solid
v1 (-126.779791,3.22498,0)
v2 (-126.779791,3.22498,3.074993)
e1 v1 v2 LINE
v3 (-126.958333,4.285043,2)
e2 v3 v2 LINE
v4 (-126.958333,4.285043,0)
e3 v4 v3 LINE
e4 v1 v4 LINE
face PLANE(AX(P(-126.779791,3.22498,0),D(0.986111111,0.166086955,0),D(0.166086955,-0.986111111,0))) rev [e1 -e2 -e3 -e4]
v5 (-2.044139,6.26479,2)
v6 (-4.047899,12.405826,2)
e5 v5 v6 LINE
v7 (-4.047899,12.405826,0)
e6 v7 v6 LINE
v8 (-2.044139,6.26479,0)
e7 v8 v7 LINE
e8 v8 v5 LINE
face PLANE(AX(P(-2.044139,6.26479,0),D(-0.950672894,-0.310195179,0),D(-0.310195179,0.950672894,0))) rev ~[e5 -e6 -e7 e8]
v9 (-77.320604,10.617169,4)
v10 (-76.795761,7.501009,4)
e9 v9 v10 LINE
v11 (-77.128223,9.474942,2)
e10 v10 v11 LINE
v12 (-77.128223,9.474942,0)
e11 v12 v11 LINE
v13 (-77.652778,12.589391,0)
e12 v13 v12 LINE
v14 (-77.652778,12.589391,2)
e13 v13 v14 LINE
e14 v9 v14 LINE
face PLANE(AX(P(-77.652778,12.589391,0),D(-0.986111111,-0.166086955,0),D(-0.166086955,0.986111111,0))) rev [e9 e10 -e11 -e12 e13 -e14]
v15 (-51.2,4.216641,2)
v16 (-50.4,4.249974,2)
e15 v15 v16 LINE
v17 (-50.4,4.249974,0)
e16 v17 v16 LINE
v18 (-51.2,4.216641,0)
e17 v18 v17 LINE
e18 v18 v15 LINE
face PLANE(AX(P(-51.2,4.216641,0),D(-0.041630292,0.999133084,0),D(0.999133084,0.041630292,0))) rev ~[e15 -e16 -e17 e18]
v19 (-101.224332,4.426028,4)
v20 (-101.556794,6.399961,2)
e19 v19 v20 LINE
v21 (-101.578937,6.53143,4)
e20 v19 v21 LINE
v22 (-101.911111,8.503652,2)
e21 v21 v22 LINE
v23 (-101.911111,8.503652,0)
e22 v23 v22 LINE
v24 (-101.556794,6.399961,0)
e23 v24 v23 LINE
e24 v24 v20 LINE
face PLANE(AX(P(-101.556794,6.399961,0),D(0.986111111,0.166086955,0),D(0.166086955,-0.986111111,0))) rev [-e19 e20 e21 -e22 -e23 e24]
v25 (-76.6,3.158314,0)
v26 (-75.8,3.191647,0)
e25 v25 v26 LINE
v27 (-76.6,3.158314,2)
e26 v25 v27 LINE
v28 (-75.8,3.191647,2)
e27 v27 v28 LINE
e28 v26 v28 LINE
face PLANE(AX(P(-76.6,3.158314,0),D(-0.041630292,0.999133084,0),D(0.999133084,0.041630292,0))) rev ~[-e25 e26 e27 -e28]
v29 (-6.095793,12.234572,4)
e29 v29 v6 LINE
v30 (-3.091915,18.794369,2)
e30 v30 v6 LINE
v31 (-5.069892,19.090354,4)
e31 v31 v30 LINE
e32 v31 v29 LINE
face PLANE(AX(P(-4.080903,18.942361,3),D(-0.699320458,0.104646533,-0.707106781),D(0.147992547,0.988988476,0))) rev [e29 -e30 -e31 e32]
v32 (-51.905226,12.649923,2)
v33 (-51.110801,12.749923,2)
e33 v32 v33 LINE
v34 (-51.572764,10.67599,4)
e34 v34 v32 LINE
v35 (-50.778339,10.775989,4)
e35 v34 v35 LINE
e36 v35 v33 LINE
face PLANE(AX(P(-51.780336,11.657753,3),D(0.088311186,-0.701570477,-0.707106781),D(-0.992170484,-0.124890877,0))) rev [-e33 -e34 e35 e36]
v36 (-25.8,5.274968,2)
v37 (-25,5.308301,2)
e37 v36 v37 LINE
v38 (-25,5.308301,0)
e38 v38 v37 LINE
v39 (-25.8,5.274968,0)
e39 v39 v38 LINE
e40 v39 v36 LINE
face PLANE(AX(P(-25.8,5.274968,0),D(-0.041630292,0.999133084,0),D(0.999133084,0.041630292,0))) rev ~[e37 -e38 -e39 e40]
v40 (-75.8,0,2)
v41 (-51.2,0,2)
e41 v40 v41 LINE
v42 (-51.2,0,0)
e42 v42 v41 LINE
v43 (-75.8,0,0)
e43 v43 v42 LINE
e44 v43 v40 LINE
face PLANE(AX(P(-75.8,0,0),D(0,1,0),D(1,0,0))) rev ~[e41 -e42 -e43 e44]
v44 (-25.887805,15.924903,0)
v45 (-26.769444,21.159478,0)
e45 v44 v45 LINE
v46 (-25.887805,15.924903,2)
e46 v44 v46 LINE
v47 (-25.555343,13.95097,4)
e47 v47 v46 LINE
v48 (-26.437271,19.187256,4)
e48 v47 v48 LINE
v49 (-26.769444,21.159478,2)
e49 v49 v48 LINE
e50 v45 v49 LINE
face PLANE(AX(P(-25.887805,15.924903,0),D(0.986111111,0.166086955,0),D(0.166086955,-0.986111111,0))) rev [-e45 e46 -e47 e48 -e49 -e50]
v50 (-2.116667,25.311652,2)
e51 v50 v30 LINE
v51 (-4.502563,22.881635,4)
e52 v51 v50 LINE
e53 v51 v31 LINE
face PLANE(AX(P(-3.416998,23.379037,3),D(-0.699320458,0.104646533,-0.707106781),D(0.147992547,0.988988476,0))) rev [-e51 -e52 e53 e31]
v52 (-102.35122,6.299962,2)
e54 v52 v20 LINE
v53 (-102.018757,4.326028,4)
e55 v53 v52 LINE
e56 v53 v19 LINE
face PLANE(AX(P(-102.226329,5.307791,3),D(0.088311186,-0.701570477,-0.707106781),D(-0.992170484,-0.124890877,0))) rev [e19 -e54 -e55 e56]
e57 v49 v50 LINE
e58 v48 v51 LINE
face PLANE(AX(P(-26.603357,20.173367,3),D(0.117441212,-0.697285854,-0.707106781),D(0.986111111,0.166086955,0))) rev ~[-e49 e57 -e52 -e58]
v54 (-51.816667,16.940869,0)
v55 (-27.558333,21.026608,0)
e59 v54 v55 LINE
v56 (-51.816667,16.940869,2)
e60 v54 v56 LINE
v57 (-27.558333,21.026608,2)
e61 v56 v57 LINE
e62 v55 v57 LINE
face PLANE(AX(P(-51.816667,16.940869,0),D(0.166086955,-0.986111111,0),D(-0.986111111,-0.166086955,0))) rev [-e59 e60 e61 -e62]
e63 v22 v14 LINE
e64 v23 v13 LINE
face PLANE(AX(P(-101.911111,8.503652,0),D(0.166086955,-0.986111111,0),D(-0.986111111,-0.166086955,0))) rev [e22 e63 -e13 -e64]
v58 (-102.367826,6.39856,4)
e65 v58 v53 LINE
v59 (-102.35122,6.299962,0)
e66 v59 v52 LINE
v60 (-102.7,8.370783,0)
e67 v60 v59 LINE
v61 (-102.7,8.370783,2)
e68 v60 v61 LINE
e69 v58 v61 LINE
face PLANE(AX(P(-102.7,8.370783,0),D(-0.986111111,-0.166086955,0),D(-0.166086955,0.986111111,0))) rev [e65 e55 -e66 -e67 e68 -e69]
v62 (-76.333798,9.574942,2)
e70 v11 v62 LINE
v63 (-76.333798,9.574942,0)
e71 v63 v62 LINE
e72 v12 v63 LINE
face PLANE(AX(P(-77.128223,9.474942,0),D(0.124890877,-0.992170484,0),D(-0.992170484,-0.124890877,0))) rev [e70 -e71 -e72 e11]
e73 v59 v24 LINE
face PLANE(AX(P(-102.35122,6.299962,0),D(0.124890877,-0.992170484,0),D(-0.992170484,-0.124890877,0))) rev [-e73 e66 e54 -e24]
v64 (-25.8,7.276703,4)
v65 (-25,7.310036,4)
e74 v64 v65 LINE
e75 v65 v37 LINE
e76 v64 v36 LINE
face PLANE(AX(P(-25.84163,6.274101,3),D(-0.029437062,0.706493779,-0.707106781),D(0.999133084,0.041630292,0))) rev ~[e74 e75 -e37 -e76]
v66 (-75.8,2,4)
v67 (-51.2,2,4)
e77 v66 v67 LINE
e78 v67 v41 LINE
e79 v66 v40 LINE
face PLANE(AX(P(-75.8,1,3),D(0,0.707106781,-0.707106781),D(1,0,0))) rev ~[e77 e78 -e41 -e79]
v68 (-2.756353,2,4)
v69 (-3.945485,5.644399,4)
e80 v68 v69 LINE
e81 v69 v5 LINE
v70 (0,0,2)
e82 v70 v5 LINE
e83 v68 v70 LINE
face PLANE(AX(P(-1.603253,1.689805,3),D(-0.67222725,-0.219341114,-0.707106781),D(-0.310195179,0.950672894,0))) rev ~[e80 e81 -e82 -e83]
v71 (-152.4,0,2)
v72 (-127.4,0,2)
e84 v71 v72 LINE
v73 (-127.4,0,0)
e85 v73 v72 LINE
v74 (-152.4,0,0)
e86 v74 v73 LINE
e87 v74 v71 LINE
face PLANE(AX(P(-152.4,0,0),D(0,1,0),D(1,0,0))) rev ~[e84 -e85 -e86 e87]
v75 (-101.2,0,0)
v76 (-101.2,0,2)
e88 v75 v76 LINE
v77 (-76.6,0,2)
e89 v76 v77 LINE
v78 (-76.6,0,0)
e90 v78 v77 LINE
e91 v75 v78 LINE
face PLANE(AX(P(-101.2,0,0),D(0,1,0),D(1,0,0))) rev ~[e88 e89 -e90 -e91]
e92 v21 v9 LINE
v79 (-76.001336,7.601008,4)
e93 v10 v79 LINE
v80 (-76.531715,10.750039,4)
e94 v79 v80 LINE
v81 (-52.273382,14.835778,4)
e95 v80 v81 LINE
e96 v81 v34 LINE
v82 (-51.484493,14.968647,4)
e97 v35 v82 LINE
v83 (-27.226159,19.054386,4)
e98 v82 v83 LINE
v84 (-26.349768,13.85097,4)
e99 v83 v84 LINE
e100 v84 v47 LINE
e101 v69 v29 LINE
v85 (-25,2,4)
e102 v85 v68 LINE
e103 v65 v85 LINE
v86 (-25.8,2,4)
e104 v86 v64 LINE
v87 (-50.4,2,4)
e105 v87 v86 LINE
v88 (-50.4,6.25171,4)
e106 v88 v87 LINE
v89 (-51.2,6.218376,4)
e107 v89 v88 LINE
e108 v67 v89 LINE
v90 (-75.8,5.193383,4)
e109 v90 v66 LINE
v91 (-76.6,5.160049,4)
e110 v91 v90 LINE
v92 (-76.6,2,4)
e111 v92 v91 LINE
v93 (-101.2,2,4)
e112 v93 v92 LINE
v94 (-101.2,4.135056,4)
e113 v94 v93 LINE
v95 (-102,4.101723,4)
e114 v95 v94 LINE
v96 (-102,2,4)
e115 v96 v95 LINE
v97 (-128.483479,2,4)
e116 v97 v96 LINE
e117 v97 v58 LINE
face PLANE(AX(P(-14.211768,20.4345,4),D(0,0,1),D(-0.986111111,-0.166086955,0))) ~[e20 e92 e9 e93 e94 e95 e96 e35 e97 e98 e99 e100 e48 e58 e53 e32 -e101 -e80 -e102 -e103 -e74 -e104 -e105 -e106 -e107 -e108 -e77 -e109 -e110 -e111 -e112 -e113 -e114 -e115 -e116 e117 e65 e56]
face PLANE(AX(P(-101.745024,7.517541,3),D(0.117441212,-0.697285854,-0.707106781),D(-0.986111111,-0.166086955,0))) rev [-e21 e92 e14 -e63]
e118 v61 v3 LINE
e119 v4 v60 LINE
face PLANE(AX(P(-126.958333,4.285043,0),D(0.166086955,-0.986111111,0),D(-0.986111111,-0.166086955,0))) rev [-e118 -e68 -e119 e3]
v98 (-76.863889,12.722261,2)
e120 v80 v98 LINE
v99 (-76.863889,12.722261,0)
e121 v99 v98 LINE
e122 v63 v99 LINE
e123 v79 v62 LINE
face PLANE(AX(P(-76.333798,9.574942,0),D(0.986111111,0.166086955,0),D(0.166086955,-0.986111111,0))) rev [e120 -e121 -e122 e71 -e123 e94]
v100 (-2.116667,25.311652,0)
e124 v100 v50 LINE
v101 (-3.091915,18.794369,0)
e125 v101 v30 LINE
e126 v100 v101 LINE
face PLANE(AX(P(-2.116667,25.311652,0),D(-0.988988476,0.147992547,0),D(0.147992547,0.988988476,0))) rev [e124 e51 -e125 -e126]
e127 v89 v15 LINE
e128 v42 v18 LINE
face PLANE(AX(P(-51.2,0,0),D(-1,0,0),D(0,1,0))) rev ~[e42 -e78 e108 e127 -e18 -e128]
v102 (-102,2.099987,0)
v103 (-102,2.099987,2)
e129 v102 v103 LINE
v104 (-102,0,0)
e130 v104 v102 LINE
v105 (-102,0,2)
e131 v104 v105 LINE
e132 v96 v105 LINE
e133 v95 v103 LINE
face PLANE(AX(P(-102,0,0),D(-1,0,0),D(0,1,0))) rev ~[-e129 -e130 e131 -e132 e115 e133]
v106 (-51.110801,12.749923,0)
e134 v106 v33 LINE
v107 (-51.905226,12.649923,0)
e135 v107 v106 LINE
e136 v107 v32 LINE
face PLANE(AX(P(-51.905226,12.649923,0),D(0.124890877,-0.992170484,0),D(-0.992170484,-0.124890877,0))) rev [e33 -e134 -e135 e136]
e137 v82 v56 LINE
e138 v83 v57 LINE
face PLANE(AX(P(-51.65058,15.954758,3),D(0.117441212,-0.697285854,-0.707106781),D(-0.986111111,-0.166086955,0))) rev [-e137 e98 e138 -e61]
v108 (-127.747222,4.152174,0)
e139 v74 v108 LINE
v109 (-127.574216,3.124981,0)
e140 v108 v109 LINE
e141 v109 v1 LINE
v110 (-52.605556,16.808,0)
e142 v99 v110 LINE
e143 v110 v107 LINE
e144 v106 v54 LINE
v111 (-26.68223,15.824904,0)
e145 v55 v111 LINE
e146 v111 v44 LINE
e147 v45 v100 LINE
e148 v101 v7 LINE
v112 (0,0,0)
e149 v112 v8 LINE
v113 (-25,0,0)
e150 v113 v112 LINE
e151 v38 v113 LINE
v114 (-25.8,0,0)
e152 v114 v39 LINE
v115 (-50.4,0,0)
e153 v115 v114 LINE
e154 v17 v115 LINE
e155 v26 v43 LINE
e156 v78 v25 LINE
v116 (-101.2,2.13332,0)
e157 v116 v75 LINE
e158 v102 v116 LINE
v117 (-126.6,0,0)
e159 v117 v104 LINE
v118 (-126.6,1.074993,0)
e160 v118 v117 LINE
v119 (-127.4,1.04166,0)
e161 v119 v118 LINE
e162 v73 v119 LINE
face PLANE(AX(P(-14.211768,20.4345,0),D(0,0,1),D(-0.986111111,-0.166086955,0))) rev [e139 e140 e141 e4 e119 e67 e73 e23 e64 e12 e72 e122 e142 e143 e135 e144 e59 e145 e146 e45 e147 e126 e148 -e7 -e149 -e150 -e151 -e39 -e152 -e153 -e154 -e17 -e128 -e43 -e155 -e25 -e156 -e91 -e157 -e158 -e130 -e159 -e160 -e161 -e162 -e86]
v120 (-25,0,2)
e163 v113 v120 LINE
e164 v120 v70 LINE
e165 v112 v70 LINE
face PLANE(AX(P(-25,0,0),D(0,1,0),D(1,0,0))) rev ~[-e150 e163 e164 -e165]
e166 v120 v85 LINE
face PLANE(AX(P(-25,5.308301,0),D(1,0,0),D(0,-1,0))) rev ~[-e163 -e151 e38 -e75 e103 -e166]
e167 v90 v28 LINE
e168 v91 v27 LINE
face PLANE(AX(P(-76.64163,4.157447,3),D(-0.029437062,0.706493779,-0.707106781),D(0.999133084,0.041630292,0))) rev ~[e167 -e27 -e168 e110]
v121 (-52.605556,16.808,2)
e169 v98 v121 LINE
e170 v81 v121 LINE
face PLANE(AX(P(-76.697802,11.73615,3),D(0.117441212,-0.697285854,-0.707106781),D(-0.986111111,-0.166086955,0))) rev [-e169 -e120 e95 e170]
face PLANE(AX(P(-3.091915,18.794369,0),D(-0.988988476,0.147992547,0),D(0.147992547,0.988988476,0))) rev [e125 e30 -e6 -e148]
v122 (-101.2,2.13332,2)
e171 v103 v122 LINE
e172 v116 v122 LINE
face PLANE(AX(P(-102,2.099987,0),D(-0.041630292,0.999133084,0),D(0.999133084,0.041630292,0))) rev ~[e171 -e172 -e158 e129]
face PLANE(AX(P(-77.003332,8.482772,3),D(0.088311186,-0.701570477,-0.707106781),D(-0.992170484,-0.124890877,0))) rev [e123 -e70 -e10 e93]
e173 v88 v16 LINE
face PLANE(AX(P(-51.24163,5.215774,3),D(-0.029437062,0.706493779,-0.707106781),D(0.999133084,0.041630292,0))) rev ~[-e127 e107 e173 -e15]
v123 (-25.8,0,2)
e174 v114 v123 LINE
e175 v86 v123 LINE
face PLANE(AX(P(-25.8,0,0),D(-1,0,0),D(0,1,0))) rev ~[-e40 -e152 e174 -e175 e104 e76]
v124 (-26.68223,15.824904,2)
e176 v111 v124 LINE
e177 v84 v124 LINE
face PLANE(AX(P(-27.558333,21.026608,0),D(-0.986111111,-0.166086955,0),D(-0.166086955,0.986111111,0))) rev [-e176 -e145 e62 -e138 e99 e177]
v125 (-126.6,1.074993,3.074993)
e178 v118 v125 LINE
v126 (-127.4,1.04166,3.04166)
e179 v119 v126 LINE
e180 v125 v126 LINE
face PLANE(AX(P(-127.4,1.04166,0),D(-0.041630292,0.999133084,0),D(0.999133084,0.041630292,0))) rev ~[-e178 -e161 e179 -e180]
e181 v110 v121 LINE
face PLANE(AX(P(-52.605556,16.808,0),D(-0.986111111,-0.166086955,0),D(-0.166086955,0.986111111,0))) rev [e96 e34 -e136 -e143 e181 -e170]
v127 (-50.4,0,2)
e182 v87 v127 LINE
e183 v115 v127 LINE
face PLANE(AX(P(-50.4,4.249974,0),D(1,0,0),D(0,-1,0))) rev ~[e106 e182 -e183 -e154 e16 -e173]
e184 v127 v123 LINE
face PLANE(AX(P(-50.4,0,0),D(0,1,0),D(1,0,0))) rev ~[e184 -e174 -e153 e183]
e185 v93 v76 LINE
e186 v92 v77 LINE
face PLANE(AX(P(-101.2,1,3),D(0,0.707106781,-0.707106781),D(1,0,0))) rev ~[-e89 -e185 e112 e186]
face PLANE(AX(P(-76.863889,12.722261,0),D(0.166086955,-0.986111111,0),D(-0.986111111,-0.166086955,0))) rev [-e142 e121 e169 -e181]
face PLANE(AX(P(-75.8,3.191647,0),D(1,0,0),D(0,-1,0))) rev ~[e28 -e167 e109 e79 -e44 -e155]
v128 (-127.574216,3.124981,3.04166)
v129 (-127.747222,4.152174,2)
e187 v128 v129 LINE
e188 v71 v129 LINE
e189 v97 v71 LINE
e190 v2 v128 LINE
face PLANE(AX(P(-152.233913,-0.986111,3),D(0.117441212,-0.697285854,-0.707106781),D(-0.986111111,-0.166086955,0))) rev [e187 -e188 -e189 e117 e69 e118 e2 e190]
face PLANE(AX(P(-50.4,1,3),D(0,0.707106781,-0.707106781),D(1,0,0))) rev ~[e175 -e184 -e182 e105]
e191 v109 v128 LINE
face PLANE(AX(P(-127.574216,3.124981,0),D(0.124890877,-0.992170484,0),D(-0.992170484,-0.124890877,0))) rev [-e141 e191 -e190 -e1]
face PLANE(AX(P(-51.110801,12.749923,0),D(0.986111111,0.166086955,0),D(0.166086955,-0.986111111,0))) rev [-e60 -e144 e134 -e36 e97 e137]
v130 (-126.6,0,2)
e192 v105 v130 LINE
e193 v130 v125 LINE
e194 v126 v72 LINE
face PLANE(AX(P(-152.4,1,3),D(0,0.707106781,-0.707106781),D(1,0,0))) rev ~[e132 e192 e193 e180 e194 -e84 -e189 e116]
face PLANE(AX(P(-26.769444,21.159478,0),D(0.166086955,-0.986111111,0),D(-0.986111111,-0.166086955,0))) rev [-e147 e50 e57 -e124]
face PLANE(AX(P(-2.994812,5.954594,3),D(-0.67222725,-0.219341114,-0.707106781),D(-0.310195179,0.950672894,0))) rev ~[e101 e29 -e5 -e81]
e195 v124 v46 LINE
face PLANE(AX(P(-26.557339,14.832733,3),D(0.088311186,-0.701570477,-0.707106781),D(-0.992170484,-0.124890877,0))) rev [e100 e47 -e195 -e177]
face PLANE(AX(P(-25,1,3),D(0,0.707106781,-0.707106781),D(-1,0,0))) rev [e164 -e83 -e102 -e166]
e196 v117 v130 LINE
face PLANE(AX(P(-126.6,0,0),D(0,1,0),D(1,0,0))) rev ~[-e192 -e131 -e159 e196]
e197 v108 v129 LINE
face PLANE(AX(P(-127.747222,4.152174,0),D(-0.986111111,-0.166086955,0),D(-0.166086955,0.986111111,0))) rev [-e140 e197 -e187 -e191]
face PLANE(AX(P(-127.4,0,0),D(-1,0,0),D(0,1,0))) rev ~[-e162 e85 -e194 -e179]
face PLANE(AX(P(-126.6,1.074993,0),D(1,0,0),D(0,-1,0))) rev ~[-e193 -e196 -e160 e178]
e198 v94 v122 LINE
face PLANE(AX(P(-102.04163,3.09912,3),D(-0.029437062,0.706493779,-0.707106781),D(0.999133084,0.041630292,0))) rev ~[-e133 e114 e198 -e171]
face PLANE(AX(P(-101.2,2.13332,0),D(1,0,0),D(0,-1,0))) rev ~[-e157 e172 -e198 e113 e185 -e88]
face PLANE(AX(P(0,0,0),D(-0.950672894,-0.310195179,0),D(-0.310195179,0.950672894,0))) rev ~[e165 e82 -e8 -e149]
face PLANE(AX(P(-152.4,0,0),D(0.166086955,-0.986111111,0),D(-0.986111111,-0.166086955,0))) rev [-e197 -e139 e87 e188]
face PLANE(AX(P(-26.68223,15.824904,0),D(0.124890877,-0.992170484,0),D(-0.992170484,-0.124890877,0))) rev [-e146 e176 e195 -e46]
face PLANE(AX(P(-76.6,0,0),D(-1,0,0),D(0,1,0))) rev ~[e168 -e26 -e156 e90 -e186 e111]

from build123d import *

# Parameters (mm, degrees)
F2_DEPTH    = 4
F3_C1_SIZE  = 2
F3_C2_SIZE  = 2
F3_C3_SIZE  = 2
F3_C4_SIZE  = 2
F3_C5_SIZE  = 2
F3_C6_SIZE  = 2
F3_C7_SIZE  = 2
F3_C8_SIZE  = 2
F3_C9_SIZE  = 2
F3_C10_SIZE = 2


with BuildPart() as f2:
    # F1 (on Top) → F2 (new body)
    with BuildSketch(Plane.XY):
        Polygon((-25, 0), (0, 0), (-2.0441389628, 6.2647895141), (-25, 5.3083011104), align=None)
        Polygon((-25, 5.3083011104), (-2.0441389628, 6.2647895141), (-4.0478985191, 12.4058259531), (-75.8, 6.4056137967), (-75.8, 3.1916472924), (-51.2, 4.2166410704), (-51.2, 7.6929950155), (-50.4, 7.6929950155), (-50.4, 4.2499742014), (-25.8, 5.2749679794), (-25.8, 7.6929950155), (-25, 7.6929950155), align=None)
        Polygon((-50.4, 0), (-25.8, 0), (-25.8, 5.2749679794), (-50.4, 4.2499742014), align=None)
        Polygon((-75.8, 0), (-51.2, 0), (-51.2, 4.2166410704), (-75.8, 3.1916472924), align=None)
        Polygon((-51.2, 4.2166410704), (-50.4, 4.2499742014), (-50.4, 7.6929950155), (-51.2, 7.6929950155), align=None)
        Polygon((-25.8, 5.2749679794), (-25, 5.3083011104), (-25, 7.6929950155), (-25.8, 7.6929950155), align=None)
        Polygon((-76.6, 3.1583141614), (-76.6, 6.3387144359), (-101.2, 4.2815590912), (-101.2, 2.1333203834), align=None)
        Polygon((-75.8, 3.1916472924), (-75.8, 6.4056137967), (-76.6, 6.3387144359), (-76.6, 3.1583141614), align=None)
        Polygon((-76.6, 0), (-76.6, 3.1583141614), (-101.2, 2.1333203834), (-101.2, 0), align=None)
        Polygon((-101.2, 2.1333203834), (-101.2, 4.2815590912), (-102, 4.2146597304), (-102, 2.0999872524), align=None)
        Polygon((-102, 0), (-102, 2.0999872524), (-126.6, 1.0749934745), (-126.6, 0), align=None)
        Polygon((-102, 2.0999872524), (-102, 4.2146597304), (-126.6, 2.1575043858), (-126.6, 1.0749934745), align=None)
        Polygon((-126.6, 1.0749934745), (-126.6, 2.1575043858), (-127.4, 2.090605025), (-127.4, 1.0416603435), align=None)
        Polygon((-127.4, 1.0416603435), (-127.4, 2.090605025), (-152.4, 0), align=None)
        Polygon((-127.4, 1.0416603435), (-152.4, 0), (-127.4, 0), align=None)
    extrude(amount=F2_DEPTH)

    # F3: chamfer of 2 on 11 edges, made by hand

    # F3_c1
    f3_c1_edges = [f2.edges().sort_by_distance(p)[0] for p in [
        (-12.5, 0, 4),
    ]]
    chamfer(f3_c1_edges, length=F3_C1_SIZE)

    # F3_c2
    f3_c2_edges = [f2.edges().sort_by_distance(p)[0] for p in [
        (-2.350239386, 7.2029129766, 4),
    ]]
    chamfer(f3_c2_edges, length=F3_C2_SIZE)

    # F3_c3
    f3_c3_edges = [f2.edges().sort_by_distance(p)[0] for p in [
        (-139.9, 0, 4),
    ]]
    chamfer(f3_c3_edges, length=F3_C3_SIZE)

    # F3_c4
    f3_c4_edges = [f2.edges().sort_by_distance(p)[0] for p in [
        (-101.6, 2.1166538179, 4),
    ]]
    chamfer(f3_c4_edges, length=F3_C4_SIZE)

    # F3_c5
    f3_c5_edges = [f2.edges().sort_by_distance(p)[0] for p in [
        (-88.9, 0, 4),
    ]]
    chamfer(f3_c5_edges, length=F3_C5_SIZE)

    # F3_c6
    f3_c6_edges = [f2.edges().sort_by_distance(p)[0] for p in [
        (-76.2, 3.1749807269, 4),
    ]]
    chamfer(f3_c6_edges, length=F3_C6_SIZE)

    # F3_c7
    f3_c7_edges = [f2.edges().sort_by_distance(p)[0] for p in [
        (-63.5, 0, 4),
    ]]
    chamfer(f3_c7_edges, length=F3_C7_SIZE)

    # F3_c8
    f3_c8_edges = [f2.edges().sort_by_distance(p)[0] for p in [
        (-50.8, 4.2333076359, 4),
    ]]
    chamfer(f3_c8_edges, length=F3_C8_SIZE)

    # F3_c9
    f3_c9_edges = [f2.edges().sort_by_distance(p)[0] for p in [
        (-38.1, 0, 4),
    ]]
    chamfer(f3_c9_edges, length=F3_C9_SIZE)

    # F3_c10
    f3_c10_edges = [f2.edges().sort_by_distance(p)[0] for p in [
        (-25.4, 5.2916345449, 4),
    ]]
    chamfer(f3_c10_edges, length=F3_C10_SIZE)

    # F4: F2 across face


with BuildPart() as f2_1:
    add(f2.part)
    add(f2.part.mirror(Plane(origin=(-75.6988371999, 6.414073455, 1.938990945), x_dir=(-0.9965217286, -0.0833333333, 0), z_dir=(-0.0833333333, 0.9965217286, 0))))


solid = f2_1.part
